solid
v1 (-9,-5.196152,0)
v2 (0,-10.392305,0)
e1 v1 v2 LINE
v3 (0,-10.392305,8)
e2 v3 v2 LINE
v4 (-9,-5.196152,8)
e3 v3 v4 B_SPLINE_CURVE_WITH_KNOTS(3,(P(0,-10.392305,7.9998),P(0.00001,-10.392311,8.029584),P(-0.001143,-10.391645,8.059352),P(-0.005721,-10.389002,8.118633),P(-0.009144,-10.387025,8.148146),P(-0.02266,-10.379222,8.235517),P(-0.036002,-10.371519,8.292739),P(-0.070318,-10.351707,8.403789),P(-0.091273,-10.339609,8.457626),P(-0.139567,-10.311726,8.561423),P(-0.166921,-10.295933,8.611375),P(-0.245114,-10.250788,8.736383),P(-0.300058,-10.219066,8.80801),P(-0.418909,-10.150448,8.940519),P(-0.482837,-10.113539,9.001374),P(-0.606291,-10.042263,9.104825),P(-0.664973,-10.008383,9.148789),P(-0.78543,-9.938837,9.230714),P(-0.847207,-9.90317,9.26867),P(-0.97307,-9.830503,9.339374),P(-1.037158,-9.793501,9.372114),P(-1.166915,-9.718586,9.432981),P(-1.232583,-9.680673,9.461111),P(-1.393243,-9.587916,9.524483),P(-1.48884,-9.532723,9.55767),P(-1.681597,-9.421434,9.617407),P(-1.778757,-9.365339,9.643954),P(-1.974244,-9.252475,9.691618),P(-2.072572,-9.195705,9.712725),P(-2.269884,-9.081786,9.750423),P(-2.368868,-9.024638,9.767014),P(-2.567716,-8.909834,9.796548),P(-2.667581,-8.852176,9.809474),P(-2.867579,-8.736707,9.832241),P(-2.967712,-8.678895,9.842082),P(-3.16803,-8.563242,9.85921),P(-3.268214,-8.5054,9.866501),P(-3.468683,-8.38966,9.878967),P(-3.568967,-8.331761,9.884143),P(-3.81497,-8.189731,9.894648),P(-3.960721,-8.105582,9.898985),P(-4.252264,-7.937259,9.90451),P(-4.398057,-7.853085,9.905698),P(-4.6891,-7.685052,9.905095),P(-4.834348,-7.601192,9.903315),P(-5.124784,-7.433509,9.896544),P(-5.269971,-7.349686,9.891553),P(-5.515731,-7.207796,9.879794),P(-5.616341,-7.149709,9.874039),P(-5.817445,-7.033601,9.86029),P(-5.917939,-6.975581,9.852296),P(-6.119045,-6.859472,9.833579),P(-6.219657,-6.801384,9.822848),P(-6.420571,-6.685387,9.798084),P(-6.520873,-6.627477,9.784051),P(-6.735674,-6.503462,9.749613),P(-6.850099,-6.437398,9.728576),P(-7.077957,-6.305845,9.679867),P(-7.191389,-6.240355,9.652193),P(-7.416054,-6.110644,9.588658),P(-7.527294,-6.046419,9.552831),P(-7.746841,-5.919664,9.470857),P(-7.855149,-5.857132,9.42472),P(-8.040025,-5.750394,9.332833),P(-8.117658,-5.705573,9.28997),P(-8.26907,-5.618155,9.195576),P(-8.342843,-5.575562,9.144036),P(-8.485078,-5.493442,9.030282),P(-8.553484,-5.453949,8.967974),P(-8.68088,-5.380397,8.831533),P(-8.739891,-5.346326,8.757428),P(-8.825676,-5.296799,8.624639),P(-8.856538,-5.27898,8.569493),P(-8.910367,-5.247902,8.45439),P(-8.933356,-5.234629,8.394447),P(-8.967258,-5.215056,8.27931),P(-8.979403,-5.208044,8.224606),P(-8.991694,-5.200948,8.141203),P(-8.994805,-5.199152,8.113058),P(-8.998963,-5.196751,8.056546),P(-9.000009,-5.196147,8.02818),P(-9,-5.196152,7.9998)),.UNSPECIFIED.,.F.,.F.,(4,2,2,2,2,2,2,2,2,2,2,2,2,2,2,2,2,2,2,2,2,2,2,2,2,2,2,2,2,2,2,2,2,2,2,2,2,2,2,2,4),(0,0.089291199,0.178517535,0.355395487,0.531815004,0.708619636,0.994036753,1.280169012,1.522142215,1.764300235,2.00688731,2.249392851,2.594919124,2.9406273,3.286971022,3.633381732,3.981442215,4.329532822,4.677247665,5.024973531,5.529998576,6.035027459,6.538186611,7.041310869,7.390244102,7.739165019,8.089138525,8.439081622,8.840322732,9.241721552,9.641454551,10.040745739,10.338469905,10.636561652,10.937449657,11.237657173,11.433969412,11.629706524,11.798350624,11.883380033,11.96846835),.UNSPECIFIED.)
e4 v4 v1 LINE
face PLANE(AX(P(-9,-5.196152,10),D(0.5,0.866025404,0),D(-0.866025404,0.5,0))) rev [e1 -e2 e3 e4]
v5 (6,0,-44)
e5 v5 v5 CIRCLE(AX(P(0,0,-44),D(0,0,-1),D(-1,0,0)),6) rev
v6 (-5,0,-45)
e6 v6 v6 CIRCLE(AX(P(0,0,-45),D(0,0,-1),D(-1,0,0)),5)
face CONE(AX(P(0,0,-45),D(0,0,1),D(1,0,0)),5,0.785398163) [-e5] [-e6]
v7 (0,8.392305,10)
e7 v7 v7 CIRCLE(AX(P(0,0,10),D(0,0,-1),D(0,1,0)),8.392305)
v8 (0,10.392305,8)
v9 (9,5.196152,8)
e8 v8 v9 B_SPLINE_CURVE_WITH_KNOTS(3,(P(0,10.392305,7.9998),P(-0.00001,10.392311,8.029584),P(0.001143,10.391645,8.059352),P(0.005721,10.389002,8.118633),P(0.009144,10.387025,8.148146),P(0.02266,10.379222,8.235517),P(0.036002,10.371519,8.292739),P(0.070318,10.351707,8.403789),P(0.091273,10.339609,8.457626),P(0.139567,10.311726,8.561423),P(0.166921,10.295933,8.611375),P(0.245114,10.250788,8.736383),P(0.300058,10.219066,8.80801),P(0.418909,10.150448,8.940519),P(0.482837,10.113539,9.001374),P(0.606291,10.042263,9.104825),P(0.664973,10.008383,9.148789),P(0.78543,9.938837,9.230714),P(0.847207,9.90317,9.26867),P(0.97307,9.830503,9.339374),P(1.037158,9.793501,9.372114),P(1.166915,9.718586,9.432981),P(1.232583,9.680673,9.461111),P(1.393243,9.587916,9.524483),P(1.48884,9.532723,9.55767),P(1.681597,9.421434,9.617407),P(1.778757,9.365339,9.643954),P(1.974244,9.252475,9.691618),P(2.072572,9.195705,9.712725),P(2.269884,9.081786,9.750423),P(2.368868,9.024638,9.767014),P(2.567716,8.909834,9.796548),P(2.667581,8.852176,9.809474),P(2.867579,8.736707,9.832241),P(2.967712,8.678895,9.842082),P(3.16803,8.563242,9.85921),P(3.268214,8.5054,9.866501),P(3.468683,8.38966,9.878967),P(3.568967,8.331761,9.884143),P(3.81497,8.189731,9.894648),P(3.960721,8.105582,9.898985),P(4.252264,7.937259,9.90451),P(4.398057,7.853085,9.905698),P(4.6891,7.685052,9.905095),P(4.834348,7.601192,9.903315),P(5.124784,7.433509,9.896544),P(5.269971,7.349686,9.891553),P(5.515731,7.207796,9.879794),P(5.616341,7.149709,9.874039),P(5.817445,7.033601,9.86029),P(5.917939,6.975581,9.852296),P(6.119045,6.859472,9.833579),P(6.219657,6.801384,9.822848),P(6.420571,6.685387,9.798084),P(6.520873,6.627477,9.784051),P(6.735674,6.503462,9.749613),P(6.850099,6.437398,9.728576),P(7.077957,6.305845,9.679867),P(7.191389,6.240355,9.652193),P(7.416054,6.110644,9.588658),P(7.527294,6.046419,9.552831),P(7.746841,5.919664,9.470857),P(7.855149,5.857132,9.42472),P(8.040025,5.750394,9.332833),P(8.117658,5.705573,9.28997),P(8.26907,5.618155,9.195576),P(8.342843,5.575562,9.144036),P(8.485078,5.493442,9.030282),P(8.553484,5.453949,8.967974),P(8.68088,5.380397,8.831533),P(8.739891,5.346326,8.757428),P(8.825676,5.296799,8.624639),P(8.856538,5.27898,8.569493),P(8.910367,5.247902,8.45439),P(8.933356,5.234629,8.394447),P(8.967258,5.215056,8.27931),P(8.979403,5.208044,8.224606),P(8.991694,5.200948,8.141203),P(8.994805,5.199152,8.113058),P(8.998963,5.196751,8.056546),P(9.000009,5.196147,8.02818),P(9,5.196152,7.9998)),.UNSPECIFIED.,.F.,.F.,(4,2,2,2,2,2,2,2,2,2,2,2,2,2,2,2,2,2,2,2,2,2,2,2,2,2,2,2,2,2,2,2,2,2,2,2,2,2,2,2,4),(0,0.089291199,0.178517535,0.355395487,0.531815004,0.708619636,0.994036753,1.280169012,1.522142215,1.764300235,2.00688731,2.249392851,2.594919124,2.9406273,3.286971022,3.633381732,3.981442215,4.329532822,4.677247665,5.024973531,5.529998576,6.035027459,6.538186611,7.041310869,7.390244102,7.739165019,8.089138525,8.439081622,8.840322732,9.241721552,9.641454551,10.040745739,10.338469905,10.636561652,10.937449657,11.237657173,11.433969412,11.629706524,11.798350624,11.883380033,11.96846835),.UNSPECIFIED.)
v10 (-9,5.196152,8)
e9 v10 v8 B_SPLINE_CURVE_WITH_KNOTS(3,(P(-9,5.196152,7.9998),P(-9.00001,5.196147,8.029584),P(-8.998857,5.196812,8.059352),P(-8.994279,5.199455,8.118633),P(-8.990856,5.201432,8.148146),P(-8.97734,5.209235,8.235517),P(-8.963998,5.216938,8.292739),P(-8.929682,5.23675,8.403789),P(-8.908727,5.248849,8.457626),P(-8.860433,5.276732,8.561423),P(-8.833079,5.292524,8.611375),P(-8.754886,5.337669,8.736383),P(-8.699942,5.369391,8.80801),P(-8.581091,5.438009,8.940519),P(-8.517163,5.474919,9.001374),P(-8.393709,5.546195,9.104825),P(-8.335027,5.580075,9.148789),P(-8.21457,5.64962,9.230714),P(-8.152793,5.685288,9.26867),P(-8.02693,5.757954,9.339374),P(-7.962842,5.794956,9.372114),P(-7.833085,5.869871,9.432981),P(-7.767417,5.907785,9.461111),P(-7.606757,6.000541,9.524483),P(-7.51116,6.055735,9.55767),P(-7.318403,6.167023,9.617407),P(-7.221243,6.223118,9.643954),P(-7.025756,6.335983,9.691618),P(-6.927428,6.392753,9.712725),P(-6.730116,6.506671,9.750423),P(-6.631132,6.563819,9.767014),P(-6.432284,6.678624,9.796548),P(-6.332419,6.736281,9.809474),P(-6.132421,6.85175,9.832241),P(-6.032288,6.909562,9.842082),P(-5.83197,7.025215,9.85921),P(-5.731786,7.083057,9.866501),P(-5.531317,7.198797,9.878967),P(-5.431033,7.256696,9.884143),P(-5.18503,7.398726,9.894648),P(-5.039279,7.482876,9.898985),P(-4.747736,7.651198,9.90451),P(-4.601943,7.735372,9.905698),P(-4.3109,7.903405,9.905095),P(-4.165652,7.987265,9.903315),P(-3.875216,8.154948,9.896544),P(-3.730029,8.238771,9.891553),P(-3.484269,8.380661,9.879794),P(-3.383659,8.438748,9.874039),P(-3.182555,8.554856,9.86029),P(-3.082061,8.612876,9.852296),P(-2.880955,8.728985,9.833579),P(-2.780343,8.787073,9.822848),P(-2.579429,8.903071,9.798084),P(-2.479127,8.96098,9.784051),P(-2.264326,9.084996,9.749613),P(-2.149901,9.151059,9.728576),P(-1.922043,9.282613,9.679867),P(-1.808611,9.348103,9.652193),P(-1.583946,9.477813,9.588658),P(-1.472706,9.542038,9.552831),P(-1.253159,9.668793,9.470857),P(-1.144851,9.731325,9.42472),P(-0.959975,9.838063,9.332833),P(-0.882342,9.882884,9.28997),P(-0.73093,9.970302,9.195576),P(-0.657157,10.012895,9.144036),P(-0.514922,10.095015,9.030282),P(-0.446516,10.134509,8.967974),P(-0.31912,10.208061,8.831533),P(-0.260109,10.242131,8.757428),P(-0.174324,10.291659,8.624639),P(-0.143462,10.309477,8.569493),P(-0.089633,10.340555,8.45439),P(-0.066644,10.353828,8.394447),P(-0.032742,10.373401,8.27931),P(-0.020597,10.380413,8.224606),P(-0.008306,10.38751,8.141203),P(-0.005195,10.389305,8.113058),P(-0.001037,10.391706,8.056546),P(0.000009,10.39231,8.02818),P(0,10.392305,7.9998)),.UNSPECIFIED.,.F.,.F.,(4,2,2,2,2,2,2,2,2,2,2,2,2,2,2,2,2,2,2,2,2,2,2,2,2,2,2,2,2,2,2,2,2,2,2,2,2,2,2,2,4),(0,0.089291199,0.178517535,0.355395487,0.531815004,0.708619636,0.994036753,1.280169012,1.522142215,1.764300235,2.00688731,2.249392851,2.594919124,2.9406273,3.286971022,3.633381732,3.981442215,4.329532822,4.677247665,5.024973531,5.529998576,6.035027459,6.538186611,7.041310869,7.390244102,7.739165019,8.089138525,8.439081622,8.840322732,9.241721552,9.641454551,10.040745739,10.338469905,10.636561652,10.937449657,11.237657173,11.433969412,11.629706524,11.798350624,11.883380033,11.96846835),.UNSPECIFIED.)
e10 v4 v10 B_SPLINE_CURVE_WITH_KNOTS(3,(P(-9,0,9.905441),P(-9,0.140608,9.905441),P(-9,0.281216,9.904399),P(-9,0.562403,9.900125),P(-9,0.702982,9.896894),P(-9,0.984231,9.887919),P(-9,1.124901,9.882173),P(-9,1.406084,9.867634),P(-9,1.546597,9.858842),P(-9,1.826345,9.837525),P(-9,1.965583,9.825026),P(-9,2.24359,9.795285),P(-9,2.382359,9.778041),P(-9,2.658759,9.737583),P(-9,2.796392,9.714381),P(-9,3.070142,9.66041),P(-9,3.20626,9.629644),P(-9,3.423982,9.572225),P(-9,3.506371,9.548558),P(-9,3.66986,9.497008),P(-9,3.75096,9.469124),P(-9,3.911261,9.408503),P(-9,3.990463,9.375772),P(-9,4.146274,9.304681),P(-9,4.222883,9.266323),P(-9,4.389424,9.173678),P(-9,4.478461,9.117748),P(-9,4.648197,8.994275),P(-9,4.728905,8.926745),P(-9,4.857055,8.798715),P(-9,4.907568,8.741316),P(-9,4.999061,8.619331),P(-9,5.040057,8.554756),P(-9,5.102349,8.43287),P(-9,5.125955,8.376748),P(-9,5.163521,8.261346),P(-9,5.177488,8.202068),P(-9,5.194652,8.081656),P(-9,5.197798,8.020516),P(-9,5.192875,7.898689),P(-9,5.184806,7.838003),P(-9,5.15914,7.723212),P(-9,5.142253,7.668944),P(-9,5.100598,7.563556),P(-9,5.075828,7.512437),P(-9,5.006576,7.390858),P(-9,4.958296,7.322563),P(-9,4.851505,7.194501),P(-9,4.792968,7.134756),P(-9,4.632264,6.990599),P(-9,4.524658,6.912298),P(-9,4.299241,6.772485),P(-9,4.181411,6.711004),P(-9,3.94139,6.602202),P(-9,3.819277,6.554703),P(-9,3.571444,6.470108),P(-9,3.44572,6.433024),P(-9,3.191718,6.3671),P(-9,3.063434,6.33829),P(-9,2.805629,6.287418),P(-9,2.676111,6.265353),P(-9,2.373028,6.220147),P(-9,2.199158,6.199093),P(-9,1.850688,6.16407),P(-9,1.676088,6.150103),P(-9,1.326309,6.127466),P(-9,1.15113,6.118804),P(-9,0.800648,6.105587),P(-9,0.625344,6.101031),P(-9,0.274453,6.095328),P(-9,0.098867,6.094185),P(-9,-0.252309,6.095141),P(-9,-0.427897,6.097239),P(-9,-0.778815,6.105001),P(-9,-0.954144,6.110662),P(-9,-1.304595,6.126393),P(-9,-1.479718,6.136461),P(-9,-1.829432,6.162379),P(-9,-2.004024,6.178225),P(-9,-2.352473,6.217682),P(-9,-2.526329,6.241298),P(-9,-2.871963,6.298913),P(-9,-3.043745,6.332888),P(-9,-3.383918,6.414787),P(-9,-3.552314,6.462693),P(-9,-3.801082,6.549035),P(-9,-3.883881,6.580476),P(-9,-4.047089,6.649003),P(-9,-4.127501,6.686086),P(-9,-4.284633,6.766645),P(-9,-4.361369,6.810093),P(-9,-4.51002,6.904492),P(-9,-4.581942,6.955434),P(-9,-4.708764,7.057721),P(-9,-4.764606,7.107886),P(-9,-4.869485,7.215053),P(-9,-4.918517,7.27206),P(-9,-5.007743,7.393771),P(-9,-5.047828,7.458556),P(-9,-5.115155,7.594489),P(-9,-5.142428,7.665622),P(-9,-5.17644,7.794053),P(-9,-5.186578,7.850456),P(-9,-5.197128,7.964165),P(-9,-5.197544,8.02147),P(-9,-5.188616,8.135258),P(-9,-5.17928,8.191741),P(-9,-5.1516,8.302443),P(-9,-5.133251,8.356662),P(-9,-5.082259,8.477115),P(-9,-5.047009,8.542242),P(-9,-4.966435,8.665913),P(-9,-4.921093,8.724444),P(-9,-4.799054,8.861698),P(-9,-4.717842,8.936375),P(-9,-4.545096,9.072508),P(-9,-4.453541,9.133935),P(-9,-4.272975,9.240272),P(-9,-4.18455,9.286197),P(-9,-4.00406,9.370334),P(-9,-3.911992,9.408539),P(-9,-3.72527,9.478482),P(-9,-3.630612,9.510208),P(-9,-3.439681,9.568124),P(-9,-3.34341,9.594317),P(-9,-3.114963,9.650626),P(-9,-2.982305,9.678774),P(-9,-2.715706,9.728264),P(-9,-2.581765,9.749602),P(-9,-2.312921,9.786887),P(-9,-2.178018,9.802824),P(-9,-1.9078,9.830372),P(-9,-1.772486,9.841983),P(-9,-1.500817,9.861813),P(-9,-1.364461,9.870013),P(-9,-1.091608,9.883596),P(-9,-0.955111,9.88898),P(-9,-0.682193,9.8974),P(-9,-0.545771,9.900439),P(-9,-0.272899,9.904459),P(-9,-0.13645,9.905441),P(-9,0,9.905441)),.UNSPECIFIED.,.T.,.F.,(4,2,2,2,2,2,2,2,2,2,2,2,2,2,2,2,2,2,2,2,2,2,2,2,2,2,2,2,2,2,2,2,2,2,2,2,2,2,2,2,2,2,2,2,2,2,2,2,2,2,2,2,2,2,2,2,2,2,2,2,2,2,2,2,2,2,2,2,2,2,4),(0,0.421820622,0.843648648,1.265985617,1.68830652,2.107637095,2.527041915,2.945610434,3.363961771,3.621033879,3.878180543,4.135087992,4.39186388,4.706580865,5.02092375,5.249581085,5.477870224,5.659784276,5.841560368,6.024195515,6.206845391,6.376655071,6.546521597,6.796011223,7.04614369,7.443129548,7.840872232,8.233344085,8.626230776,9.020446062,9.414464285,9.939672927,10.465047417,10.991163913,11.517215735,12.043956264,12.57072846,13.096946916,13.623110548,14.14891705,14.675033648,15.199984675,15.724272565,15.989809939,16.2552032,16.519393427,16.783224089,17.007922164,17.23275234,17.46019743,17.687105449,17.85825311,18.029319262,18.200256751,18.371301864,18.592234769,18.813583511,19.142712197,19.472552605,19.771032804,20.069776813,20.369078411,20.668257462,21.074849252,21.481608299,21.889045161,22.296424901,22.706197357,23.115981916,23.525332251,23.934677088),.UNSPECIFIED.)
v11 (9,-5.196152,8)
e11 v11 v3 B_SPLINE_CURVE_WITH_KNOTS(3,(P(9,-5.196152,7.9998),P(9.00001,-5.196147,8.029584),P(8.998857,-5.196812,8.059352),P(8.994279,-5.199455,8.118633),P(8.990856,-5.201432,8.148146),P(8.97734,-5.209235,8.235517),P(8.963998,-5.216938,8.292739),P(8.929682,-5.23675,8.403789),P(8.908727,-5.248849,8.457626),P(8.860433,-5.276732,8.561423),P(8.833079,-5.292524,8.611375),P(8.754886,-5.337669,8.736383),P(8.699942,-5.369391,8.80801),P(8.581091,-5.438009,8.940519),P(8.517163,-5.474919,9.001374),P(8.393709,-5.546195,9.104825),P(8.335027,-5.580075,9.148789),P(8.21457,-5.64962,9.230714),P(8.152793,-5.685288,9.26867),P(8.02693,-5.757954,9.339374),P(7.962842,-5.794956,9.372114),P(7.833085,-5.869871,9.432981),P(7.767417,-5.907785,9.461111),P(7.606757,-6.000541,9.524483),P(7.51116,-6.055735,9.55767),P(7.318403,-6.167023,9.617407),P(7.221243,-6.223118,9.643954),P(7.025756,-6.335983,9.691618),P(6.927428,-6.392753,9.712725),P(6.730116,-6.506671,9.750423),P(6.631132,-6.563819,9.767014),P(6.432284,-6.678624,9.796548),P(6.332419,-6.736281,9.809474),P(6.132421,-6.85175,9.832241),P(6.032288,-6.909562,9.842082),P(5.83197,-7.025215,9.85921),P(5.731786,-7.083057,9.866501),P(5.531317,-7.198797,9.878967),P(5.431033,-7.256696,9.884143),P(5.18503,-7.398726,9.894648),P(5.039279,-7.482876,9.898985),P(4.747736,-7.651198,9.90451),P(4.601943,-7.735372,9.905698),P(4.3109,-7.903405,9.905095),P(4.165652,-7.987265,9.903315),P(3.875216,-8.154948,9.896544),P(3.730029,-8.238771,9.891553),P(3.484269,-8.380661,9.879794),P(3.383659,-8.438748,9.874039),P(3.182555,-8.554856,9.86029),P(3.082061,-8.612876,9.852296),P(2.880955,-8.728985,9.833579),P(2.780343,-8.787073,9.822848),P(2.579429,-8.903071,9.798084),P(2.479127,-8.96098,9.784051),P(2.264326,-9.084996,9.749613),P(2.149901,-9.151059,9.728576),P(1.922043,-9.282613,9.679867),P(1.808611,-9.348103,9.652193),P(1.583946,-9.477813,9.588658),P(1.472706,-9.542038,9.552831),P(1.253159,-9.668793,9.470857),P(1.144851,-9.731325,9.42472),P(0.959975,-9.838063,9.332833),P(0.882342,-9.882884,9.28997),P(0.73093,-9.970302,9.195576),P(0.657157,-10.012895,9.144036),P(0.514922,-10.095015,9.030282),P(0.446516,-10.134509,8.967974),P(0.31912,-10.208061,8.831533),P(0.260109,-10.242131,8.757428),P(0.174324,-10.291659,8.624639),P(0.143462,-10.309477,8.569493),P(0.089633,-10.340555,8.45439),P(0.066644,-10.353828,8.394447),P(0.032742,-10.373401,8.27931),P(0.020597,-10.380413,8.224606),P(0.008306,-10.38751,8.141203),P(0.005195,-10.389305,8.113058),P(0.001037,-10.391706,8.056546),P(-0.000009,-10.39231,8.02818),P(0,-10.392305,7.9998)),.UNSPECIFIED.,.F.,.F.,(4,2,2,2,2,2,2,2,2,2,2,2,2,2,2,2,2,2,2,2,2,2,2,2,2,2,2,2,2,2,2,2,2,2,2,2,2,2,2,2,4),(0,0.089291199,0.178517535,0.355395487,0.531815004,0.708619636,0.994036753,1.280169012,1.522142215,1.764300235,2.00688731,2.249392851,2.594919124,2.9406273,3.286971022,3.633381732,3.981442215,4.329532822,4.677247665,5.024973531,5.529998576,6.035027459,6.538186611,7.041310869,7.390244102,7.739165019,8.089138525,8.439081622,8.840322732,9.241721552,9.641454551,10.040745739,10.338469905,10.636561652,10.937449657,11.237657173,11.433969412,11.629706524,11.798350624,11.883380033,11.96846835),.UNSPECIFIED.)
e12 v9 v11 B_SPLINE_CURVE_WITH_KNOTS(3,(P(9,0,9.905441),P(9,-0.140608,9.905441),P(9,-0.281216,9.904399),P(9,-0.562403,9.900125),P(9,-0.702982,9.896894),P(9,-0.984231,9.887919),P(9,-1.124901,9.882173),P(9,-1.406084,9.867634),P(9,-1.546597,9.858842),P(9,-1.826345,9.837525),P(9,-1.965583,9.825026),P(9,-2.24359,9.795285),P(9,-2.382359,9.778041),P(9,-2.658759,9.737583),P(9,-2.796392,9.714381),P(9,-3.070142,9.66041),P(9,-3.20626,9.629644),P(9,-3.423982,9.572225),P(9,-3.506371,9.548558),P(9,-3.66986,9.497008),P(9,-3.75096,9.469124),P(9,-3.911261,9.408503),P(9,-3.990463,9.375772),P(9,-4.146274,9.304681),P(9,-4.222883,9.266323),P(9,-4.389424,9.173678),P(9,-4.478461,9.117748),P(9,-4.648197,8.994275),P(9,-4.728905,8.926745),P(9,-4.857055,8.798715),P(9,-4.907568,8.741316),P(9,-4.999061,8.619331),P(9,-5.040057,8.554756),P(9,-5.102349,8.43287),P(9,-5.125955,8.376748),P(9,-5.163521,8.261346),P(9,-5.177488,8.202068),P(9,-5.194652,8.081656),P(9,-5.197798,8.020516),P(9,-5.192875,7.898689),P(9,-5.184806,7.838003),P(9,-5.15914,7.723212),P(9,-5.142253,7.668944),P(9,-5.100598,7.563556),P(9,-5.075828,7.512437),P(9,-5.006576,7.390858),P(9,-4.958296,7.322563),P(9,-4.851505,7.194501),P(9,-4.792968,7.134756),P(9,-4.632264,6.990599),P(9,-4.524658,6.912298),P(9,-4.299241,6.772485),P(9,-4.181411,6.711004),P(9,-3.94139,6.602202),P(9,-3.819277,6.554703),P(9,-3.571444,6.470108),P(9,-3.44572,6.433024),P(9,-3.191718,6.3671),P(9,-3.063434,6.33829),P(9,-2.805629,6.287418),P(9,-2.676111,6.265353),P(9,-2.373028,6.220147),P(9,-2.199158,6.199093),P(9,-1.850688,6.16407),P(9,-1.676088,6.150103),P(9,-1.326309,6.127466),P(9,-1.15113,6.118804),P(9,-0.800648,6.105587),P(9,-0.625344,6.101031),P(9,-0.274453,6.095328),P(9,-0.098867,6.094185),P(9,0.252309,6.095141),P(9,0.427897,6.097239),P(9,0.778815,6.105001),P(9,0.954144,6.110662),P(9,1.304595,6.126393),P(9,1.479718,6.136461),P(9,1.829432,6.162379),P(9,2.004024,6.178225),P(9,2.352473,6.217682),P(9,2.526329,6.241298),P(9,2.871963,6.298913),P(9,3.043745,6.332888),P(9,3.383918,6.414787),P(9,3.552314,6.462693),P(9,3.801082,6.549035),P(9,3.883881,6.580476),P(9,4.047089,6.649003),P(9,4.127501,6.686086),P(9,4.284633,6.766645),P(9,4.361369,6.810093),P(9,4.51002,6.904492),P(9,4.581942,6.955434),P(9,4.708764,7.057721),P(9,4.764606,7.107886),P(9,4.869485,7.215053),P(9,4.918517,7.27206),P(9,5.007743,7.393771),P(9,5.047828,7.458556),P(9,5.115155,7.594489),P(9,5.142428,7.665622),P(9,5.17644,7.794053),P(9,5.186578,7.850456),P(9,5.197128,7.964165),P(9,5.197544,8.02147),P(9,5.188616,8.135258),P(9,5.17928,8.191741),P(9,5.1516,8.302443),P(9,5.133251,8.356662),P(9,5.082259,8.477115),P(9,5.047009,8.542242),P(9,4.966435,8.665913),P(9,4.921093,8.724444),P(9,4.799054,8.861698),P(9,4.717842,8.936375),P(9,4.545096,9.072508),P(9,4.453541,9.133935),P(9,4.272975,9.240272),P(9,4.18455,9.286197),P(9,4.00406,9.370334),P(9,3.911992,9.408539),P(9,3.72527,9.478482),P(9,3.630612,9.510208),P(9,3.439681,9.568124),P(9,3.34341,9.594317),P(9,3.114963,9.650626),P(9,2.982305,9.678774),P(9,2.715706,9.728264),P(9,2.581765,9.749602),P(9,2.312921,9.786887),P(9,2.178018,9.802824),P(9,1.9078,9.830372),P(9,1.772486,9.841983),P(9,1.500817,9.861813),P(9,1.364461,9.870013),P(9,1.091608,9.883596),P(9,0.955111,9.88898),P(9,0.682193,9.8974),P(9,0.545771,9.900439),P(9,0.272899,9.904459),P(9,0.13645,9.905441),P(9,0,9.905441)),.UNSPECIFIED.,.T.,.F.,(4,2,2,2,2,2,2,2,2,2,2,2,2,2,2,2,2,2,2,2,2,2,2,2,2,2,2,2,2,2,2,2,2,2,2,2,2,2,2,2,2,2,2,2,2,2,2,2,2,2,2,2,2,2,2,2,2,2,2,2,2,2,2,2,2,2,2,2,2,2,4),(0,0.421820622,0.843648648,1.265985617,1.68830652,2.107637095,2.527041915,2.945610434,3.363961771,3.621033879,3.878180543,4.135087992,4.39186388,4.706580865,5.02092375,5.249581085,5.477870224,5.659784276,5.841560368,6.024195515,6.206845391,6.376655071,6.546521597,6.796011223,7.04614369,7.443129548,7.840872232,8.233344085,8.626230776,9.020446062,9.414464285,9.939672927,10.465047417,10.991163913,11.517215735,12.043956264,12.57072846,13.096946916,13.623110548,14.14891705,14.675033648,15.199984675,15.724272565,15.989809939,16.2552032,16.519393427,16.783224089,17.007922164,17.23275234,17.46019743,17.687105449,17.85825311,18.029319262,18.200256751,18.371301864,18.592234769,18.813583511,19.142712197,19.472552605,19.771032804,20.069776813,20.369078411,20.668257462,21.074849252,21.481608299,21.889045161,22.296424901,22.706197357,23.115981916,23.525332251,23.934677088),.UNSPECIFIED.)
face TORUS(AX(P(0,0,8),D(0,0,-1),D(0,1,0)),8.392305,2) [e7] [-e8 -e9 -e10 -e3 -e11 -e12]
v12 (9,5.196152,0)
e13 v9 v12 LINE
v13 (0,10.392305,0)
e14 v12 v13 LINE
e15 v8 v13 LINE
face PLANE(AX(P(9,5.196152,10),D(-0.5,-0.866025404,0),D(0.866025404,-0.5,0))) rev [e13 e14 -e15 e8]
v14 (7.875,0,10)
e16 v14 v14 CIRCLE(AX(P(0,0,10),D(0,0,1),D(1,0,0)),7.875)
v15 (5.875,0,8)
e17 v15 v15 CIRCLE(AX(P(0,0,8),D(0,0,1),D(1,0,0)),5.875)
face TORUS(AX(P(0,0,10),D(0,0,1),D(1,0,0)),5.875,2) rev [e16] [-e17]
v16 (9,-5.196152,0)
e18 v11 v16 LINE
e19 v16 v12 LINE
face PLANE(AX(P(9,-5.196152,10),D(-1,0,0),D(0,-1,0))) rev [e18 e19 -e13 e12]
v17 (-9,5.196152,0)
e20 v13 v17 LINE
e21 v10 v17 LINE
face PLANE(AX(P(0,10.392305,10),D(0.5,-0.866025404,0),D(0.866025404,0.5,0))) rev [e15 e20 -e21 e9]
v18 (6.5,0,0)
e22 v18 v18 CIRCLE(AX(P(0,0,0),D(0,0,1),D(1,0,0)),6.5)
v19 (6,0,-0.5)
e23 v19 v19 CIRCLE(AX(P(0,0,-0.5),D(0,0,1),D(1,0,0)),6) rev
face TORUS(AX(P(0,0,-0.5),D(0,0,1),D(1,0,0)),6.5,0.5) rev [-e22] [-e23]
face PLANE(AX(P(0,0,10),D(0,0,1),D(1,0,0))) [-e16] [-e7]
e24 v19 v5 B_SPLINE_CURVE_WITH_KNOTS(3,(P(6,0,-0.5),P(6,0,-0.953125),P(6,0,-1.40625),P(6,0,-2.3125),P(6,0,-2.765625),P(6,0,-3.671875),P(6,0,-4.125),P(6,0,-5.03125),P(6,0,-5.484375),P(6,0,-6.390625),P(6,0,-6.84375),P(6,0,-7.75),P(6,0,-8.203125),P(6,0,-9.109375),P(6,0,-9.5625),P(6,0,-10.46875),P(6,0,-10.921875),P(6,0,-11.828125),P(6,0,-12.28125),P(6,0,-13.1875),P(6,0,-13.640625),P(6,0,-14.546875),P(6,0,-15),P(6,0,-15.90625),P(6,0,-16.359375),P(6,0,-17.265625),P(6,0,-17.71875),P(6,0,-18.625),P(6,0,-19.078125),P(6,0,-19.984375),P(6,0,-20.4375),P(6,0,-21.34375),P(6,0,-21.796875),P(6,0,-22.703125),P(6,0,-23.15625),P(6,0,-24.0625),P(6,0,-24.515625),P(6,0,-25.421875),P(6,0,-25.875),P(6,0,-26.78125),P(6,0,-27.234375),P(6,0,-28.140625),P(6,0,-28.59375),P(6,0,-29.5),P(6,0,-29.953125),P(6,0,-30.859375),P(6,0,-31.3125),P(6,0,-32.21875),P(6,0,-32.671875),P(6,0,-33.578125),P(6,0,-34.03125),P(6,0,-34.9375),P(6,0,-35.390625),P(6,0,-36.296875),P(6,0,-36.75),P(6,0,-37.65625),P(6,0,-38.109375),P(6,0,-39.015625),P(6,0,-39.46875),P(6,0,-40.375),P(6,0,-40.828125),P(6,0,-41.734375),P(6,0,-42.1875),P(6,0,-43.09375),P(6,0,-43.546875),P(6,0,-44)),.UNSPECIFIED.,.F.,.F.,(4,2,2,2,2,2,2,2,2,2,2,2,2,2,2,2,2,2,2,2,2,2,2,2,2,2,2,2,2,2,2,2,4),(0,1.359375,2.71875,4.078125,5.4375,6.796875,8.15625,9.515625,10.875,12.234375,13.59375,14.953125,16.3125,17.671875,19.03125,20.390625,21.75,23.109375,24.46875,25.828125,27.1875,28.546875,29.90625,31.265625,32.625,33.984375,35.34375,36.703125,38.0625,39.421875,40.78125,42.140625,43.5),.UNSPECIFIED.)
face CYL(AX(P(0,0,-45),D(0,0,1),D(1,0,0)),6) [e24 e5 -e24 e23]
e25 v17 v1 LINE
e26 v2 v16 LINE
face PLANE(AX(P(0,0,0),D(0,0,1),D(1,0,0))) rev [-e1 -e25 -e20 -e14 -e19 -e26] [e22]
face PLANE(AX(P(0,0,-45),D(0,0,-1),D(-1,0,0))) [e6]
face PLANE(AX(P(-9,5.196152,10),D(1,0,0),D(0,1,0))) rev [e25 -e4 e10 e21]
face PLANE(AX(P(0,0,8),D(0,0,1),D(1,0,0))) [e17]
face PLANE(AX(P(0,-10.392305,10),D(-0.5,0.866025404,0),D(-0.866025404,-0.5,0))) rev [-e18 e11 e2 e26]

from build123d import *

# Parameters (mm, degrees)
BOSS_EXTRUDE1_DEPTH = 10
SKETCH4_R           = 6
BOSS_EXTRUDE2_DEPTH = 45
CHAMFER1_SIZE       = 1
FILLET1_R           = 0.5
SKETCH6_R           = 7.875
CUT_EXTRUDE1_DEPTH  = 2
FILLET2_R           = 2


with BuildPart() as part:
    # Sketch3 → Boss-Extrude1 (new body)
    with BuildSketch(Plane.XY):
        Polygon((0, 10.392304845), (-9, 5.196152423), (-9, -5.196152423), (0, -10.392304845), (9, -5.196152423), (9, 5.196152423), align=None)
    extrude(amount=BOSS_EXTRUDE1_DEPTH)

    # Sketch4 → Boss-Extrude2 (add)
    with BuildSketch(Plane(origin=(0, 0, 0), x_dir=(-1, 0, 0), z_dir=(0, 0, -1))):
        with Locations(Location((0, 0, 0), (0, 0, 180))):
            Circle(SKETCH4_R)
    extrude(amount=BOSS_EXTRUDE2_DEPTH)

    # Chamfer1
    chamfer1_edges = [part.edges().sort_by_distance(p)[0] for p in [
        (-6, 0, -45),
    ]]
    chamfer(chamfer1_edges, length=CHAMFER1_SIZE)

    # Fillet1
    fillet1_edges = [part.edges().sort_by_distance(p)[0] for p in [
        (-6, 0, 0),
    ]]
    fillet(fillet1_edges, radius=FILLET1_R)

    # Sketch5 → Cut-Revolve1 (revolve, cut)
    with BuildSketch(Plane(origin=(0, 0, 0), x_dir=(0, 0, -1), z_dir=(1, 0, 0))):
        with BuildLine():
            Line((-8, 10.392304845), (-10, 10.392304845))
            Line((-10, 10.392304845), (-10, 8.392304845))
            ThreePointArc((-10, 8.392304845), (-9.414213562, 9.806518408), (-8, 10.392304845))
        make_face()
    revolve(axis=Axis((0, 0, 0), (0, 0, 1)), mode=Mode.SUBTRACT)

    # Sketch6 → Cut-Extrude1 (cut)
    with BuildSketch(Plane.XY.offset(10)):
        Circle(SKETCH6_R)
    extrude(amount=-CUT_EXTRUDE1_DEPTH, mode=Mode.SUBTRACT)

    # Fillet2
    fillet2_edges = [part.edges().sort_by_distance(p)[0] for p in [
        (-7.875, 0, 8),
    ]]
    fillet(fillet2_edges, radius=FILLET2_R - 0.0001)  # a hair under: the kernel refuses the full size


solid = part.part
